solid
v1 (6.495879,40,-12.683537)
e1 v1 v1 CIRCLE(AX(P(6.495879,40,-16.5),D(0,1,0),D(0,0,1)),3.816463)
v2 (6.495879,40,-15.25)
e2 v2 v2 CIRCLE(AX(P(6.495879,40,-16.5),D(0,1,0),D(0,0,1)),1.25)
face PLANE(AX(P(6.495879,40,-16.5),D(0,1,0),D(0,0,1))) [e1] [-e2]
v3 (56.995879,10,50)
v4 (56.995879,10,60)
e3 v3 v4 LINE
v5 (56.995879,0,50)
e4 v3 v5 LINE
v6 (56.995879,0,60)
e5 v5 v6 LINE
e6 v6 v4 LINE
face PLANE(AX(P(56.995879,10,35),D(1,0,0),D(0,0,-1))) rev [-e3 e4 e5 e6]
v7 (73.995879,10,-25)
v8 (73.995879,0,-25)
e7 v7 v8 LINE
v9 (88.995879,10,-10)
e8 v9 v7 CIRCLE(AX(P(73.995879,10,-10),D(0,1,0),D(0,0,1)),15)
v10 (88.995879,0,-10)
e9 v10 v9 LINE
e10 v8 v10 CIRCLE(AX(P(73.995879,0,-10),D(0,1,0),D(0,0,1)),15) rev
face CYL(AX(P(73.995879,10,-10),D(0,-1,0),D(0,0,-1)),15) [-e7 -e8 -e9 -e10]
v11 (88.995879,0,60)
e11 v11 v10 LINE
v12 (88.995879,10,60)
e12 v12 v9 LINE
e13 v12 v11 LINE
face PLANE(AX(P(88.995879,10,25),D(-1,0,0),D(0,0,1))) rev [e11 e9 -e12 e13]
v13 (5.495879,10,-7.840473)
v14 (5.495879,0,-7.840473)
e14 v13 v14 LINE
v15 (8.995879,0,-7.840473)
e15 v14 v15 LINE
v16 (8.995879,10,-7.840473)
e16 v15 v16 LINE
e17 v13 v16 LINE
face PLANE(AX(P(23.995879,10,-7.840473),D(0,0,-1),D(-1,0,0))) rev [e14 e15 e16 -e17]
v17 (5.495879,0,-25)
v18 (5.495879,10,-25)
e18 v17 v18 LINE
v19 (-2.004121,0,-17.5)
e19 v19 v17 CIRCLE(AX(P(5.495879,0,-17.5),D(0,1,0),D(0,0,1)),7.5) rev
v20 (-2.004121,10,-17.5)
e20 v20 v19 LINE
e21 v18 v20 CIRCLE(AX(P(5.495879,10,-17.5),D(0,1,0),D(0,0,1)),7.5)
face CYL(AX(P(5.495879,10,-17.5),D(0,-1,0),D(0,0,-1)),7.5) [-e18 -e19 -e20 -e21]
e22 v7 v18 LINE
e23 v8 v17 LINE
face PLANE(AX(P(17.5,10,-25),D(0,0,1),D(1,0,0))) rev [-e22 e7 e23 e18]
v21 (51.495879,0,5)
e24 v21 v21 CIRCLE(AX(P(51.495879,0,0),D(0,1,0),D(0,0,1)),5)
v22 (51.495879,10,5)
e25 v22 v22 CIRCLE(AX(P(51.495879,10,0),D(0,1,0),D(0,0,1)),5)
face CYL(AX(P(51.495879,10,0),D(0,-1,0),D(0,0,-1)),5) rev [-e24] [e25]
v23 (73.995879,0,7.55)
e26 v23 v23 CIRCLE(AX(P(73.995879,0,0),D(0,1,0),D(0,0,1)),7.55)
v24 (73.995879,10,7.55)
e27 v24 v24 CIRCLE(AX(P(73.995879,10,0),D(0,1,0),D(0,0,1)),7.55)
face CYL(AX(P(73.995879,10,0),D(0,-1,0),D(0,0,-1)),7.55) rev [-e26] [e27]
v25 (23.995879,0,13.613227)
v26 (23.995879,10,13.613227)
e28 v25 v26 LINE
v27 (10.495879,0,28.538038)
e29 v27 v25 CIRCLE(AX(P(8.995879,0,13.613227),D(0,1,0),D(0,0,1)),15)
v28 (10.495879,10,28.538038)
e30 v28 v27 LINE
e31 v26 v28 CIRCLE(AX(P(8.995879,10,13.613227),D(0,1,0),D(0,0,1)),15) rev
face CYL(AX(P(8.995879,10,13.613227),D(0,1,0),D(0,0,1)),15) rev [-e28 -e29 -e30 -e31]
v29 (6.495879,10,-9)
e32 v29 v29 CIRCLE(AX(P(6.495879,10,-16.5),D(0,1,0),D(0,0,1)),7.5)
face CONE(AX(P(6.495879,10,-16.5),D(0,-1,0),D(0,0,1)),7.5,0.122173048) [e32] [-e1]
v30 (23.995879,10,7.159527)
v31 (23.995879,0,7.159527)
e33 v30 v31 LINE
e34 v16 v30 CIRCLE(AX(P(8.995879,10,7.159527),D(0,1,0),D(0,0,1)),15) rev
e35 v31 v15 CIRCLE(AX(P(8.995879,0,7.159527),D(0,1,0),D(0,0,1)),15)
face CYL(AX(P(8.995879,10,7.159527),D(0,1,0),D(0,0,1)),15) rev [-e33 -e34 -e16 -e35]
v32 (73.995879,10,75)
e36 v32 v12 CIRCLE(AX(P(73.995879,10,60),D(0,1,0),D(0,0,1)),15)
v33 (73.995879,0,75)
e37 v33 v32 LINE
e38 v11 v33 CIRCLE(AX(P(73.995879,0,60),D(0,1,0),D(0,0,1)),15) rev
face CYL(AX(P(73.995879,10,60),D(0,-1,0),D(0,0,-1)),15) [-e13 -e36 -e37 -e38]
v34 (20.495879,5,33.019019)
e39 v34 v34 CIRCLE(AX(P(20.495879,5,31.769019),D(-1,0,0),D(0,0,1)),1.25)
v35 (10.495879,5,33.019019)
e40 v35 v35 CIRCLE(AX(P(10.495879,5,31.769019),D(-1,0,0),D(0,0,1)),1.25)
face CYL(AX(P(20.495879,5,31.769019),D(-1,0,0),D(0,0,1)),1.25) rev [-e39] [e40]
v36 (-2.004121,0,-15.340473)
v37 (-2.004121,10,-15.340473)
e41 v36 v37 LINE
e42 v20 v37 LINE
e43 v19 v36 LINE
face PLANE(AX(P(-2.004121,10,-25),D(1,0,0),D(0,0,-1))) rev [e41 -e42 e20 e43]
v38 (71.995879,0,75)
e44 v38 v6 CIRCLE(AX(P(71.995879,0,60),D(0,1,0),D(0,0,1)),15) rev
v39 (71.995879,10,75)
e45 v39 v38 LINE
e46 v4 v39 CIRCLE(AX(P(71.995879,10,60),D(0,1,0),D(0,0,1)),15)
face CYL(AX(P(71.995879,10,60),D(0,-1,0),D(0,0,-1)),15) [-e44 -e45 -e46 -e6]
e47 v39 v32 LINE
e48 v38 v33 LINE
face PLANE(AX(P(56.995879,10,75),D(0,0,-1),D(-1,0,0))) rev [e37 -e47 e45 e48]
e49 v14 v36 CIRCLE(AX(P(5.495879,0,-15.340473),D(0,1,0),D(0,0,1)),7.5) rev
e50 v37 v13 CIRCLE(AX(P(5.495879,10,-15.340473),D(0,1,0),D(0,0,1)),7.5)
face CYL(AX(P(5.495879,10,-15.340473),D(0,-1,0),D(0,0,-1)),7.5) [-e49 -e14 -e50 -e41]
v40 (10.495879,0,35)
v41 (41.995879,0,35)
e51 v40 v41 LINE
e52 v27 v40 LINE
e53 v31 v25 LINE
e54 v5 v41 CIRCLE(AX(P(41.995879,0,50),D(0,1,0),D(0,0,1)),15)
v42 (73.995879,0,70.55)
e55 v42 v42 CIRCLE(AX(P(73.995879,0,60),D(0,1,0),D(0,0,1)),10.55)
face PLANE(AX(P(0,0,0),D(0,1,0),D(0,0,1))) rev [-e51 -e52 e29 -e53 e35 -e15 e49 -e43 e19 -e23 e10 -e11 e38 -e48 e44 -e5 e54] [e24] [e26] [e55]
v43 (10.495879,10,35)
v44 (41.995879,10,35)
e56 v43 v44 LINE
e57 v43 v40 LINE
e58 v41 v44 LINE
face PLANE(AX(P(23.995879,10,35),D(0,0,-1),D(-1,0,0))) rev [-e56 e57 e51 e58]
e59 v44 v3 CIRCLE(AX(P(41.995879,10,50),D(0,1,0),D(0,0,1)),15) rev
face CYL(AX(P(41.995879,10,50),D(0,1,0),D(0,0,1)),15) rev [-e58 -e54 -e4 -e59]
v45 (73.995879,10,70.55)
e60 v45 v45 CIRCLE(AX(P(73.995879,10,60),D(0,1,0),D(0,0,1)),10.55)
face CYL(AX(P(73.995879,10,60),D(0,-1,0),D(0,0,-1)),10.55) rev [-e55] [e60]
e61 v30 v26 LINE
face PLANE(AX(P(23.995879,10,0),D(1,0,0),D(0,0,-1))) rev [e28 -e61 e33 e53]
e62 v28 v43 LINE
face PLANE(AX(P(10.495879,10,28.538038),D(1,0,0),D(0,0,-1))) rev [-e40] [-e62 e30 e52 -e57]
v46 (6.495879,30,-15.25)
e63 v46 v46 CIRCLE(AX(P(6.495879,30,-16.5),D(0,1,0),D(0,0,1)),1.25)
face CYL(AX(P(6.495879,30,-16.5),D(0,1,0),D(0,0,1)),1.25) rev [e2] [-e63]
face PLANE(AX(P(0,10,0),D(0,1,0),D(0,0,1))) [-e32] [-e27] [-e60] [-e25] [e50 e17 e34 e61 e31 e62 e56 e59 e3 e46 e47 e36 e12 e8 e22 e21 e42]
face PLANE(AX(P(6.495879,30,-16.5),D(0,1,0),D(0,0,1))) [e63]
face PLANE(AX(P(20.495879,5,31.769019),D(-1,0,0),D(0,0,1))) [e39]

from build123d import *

# Parameters (mm, degrees)
SKETCH1_R           = 7.55
SKETCH1_R_2         = 5
SKETCH1_R_3         = 10.55
BOSS_EXTRUDE1_DEPTH = 10
SKETCH2_R           = 1.25
CUT_EXTRUDE1_DEPTH  = 10
SKETCH4_R           = 7.5
BOSS_EXTRUDE2_DEPTH = 30
BOSS_EXTRUDE2_TAPER = 7
SKETCH5_R           = 1.25
CUT_EXTRUDE2_DEPTH  = 10
FILLET1_R           = 15
FILLET2_R           = 7.5


with BuildPart() as part:
    # Sketch1 → Boss-Extrude1 (new body)
    with BuildSketch(Plane(origin=(0, 0, 0), x_dir=(1, 0, 0), z_dir=(0, 1, 0))):
        Polygon((23.995878661, -35), (56.995878661, -35), (56.995878661, -75), (88.995878661, -75), (88.995878661, -25), (88.995878661, 25), (17.5, 25), (-2.004121339, 25), (-2.004121339, 7.840472806), (23.995878661, 7.840472806), (23.995878661, 0), (23.995878661, -28.53803828), (10.495878661, -28.53803828), (10.495878661, -35), align=None)
        with Locations(Location((73.995878661, 0, 0), (0, 0, 270))):
            Circle(SKETCH1_R, mode=Mode.SUBTRACT)
        with Locations(Location((51.495878661, 0, 0), (0, 0, 270))):
            Circle(SKETCH1_R_2, mode=Mode.SUBTRACT)
        with Locations(Location((73.995878661, -60, 0), (0, 0, 270))):
            Circle(SKETCH1_R_3, mode=Mode.SUBTRACT)
    extrude(amount=BOSS_EXTRUDE1_DEPTH)

    # Sketch2 → Cut-Extrude1 (cut)
    with BuildSketch(Plane.ZY.offset(-10.495878661)):
        with Locations((31.76901914, 5)):
            Circle(SKETCH2_R)
    extrude(amount=-CUT_EXTRUDE1_DEPTH, mode=Mode.SUBTRACT)

    # Sketch4 → Boss-Extrude2 (add)
    with BuildSketch(Plane(origin=(0, 10, 0), x_dir=(1, 0, 0), z_dir=(0, 1, 0))):
        with Locations((6.495878661, 16.5)):
            Circle(SKETCH4_R)
    extrude(amount=BOSS_EXTRUDE2_DEPTH, taper=BOSS_EXTRUDE2_TAPER)

    # Sketch5 → Cut-Extrude2 (cut)
    with BuildSketch(Plane(origin=(0, 40, 0), x_dir=(1, 0, 0), z_dir=(0, 1, 0))):
        with Locations(Location((6.495878661, 16.5, 0), (0, 0, 270))):
            Circle(SKETCH5_R)
    extrude(amount=-CUT_EXTRUDE2_DEPTH, mode=Mode.SUBTRACT)

    # Fillet1
    # the kernel refuses this fillet: 15 mm, written as the material it adds along each edge
    with BuildSketch(Plane(origin=(56.995878661, 0, 35), x_dir=(-1, 0, 0), z_dir=(0, 1, 0)), Plane(origin=(23.995878661, 0, -7.840472806), x_dir=(-1, 0, 0), z_dir=(0, 1, 0))) as fillet1_piece_1:
        with BuildLine():
            CenterArc((FILLET1_R, FILLET1_R), FILLET1_R, 180, 90)
            Line((0, FILLET1_R), (0, 0))
            Line((0, 0), (FILLET1_R, 0))
        make_face()
    extrude(amount=10)
    with BuildSketch(Plane(origin=(23.995878661, 0, 28.53803828), x_dir=(0, 0, -1), z_dir=(0, 1, 0))) as fillet1_piece_2:
        with BuildLine():
            CenterArc((14.924811557, 15), FILLET1_R, 185.739170477, 84.260829523)
            Line((0, 13.5), (0, 0))
            Line((0, 0), (14.924811557, 0))
        make_face()
    extrude(amount=10)
    # the kernel refuses this fillet: 15 mm, written as the material it takes off along each edge
    with BuildSketch(Plane(origin=(88.995878661, -37.5, -25), x_dir=(0, 0, 1), z_dir=(0, 1, 0)), Plane(origin=(88.995878661, -37.5, 75), x_dir=(-1, 0, 0), z_dir=(0, 1, 0)), Plane(origin=(56.995878661, -37.5, 75), x_dir=(0, 0, -1), z_dir=(0, 1, 0))) as fillet1_2_piece_1:
        with BuildLine():
            CenterArc((FILLET1_R, -FILLET1_R), FILLET1_R, 90, 90)
            Line((0, -FILLET1_R), (0, 0))
            Line((0, 0), (FILLET1_R, 0))
        make_face()
    extrude(amount=85, mode=Mode.SUBTRACT)

    # Fillet2
    fillet2_edges = [part.edges().sort_by_distance(p)[0] for p in [
        (-2.004121339, 5, -7.840472806),
        (-2.004121339, 5, -25),
    ]]
    fillet(fillet2_edges, radius=FILLET2_R)


solid = part.part
